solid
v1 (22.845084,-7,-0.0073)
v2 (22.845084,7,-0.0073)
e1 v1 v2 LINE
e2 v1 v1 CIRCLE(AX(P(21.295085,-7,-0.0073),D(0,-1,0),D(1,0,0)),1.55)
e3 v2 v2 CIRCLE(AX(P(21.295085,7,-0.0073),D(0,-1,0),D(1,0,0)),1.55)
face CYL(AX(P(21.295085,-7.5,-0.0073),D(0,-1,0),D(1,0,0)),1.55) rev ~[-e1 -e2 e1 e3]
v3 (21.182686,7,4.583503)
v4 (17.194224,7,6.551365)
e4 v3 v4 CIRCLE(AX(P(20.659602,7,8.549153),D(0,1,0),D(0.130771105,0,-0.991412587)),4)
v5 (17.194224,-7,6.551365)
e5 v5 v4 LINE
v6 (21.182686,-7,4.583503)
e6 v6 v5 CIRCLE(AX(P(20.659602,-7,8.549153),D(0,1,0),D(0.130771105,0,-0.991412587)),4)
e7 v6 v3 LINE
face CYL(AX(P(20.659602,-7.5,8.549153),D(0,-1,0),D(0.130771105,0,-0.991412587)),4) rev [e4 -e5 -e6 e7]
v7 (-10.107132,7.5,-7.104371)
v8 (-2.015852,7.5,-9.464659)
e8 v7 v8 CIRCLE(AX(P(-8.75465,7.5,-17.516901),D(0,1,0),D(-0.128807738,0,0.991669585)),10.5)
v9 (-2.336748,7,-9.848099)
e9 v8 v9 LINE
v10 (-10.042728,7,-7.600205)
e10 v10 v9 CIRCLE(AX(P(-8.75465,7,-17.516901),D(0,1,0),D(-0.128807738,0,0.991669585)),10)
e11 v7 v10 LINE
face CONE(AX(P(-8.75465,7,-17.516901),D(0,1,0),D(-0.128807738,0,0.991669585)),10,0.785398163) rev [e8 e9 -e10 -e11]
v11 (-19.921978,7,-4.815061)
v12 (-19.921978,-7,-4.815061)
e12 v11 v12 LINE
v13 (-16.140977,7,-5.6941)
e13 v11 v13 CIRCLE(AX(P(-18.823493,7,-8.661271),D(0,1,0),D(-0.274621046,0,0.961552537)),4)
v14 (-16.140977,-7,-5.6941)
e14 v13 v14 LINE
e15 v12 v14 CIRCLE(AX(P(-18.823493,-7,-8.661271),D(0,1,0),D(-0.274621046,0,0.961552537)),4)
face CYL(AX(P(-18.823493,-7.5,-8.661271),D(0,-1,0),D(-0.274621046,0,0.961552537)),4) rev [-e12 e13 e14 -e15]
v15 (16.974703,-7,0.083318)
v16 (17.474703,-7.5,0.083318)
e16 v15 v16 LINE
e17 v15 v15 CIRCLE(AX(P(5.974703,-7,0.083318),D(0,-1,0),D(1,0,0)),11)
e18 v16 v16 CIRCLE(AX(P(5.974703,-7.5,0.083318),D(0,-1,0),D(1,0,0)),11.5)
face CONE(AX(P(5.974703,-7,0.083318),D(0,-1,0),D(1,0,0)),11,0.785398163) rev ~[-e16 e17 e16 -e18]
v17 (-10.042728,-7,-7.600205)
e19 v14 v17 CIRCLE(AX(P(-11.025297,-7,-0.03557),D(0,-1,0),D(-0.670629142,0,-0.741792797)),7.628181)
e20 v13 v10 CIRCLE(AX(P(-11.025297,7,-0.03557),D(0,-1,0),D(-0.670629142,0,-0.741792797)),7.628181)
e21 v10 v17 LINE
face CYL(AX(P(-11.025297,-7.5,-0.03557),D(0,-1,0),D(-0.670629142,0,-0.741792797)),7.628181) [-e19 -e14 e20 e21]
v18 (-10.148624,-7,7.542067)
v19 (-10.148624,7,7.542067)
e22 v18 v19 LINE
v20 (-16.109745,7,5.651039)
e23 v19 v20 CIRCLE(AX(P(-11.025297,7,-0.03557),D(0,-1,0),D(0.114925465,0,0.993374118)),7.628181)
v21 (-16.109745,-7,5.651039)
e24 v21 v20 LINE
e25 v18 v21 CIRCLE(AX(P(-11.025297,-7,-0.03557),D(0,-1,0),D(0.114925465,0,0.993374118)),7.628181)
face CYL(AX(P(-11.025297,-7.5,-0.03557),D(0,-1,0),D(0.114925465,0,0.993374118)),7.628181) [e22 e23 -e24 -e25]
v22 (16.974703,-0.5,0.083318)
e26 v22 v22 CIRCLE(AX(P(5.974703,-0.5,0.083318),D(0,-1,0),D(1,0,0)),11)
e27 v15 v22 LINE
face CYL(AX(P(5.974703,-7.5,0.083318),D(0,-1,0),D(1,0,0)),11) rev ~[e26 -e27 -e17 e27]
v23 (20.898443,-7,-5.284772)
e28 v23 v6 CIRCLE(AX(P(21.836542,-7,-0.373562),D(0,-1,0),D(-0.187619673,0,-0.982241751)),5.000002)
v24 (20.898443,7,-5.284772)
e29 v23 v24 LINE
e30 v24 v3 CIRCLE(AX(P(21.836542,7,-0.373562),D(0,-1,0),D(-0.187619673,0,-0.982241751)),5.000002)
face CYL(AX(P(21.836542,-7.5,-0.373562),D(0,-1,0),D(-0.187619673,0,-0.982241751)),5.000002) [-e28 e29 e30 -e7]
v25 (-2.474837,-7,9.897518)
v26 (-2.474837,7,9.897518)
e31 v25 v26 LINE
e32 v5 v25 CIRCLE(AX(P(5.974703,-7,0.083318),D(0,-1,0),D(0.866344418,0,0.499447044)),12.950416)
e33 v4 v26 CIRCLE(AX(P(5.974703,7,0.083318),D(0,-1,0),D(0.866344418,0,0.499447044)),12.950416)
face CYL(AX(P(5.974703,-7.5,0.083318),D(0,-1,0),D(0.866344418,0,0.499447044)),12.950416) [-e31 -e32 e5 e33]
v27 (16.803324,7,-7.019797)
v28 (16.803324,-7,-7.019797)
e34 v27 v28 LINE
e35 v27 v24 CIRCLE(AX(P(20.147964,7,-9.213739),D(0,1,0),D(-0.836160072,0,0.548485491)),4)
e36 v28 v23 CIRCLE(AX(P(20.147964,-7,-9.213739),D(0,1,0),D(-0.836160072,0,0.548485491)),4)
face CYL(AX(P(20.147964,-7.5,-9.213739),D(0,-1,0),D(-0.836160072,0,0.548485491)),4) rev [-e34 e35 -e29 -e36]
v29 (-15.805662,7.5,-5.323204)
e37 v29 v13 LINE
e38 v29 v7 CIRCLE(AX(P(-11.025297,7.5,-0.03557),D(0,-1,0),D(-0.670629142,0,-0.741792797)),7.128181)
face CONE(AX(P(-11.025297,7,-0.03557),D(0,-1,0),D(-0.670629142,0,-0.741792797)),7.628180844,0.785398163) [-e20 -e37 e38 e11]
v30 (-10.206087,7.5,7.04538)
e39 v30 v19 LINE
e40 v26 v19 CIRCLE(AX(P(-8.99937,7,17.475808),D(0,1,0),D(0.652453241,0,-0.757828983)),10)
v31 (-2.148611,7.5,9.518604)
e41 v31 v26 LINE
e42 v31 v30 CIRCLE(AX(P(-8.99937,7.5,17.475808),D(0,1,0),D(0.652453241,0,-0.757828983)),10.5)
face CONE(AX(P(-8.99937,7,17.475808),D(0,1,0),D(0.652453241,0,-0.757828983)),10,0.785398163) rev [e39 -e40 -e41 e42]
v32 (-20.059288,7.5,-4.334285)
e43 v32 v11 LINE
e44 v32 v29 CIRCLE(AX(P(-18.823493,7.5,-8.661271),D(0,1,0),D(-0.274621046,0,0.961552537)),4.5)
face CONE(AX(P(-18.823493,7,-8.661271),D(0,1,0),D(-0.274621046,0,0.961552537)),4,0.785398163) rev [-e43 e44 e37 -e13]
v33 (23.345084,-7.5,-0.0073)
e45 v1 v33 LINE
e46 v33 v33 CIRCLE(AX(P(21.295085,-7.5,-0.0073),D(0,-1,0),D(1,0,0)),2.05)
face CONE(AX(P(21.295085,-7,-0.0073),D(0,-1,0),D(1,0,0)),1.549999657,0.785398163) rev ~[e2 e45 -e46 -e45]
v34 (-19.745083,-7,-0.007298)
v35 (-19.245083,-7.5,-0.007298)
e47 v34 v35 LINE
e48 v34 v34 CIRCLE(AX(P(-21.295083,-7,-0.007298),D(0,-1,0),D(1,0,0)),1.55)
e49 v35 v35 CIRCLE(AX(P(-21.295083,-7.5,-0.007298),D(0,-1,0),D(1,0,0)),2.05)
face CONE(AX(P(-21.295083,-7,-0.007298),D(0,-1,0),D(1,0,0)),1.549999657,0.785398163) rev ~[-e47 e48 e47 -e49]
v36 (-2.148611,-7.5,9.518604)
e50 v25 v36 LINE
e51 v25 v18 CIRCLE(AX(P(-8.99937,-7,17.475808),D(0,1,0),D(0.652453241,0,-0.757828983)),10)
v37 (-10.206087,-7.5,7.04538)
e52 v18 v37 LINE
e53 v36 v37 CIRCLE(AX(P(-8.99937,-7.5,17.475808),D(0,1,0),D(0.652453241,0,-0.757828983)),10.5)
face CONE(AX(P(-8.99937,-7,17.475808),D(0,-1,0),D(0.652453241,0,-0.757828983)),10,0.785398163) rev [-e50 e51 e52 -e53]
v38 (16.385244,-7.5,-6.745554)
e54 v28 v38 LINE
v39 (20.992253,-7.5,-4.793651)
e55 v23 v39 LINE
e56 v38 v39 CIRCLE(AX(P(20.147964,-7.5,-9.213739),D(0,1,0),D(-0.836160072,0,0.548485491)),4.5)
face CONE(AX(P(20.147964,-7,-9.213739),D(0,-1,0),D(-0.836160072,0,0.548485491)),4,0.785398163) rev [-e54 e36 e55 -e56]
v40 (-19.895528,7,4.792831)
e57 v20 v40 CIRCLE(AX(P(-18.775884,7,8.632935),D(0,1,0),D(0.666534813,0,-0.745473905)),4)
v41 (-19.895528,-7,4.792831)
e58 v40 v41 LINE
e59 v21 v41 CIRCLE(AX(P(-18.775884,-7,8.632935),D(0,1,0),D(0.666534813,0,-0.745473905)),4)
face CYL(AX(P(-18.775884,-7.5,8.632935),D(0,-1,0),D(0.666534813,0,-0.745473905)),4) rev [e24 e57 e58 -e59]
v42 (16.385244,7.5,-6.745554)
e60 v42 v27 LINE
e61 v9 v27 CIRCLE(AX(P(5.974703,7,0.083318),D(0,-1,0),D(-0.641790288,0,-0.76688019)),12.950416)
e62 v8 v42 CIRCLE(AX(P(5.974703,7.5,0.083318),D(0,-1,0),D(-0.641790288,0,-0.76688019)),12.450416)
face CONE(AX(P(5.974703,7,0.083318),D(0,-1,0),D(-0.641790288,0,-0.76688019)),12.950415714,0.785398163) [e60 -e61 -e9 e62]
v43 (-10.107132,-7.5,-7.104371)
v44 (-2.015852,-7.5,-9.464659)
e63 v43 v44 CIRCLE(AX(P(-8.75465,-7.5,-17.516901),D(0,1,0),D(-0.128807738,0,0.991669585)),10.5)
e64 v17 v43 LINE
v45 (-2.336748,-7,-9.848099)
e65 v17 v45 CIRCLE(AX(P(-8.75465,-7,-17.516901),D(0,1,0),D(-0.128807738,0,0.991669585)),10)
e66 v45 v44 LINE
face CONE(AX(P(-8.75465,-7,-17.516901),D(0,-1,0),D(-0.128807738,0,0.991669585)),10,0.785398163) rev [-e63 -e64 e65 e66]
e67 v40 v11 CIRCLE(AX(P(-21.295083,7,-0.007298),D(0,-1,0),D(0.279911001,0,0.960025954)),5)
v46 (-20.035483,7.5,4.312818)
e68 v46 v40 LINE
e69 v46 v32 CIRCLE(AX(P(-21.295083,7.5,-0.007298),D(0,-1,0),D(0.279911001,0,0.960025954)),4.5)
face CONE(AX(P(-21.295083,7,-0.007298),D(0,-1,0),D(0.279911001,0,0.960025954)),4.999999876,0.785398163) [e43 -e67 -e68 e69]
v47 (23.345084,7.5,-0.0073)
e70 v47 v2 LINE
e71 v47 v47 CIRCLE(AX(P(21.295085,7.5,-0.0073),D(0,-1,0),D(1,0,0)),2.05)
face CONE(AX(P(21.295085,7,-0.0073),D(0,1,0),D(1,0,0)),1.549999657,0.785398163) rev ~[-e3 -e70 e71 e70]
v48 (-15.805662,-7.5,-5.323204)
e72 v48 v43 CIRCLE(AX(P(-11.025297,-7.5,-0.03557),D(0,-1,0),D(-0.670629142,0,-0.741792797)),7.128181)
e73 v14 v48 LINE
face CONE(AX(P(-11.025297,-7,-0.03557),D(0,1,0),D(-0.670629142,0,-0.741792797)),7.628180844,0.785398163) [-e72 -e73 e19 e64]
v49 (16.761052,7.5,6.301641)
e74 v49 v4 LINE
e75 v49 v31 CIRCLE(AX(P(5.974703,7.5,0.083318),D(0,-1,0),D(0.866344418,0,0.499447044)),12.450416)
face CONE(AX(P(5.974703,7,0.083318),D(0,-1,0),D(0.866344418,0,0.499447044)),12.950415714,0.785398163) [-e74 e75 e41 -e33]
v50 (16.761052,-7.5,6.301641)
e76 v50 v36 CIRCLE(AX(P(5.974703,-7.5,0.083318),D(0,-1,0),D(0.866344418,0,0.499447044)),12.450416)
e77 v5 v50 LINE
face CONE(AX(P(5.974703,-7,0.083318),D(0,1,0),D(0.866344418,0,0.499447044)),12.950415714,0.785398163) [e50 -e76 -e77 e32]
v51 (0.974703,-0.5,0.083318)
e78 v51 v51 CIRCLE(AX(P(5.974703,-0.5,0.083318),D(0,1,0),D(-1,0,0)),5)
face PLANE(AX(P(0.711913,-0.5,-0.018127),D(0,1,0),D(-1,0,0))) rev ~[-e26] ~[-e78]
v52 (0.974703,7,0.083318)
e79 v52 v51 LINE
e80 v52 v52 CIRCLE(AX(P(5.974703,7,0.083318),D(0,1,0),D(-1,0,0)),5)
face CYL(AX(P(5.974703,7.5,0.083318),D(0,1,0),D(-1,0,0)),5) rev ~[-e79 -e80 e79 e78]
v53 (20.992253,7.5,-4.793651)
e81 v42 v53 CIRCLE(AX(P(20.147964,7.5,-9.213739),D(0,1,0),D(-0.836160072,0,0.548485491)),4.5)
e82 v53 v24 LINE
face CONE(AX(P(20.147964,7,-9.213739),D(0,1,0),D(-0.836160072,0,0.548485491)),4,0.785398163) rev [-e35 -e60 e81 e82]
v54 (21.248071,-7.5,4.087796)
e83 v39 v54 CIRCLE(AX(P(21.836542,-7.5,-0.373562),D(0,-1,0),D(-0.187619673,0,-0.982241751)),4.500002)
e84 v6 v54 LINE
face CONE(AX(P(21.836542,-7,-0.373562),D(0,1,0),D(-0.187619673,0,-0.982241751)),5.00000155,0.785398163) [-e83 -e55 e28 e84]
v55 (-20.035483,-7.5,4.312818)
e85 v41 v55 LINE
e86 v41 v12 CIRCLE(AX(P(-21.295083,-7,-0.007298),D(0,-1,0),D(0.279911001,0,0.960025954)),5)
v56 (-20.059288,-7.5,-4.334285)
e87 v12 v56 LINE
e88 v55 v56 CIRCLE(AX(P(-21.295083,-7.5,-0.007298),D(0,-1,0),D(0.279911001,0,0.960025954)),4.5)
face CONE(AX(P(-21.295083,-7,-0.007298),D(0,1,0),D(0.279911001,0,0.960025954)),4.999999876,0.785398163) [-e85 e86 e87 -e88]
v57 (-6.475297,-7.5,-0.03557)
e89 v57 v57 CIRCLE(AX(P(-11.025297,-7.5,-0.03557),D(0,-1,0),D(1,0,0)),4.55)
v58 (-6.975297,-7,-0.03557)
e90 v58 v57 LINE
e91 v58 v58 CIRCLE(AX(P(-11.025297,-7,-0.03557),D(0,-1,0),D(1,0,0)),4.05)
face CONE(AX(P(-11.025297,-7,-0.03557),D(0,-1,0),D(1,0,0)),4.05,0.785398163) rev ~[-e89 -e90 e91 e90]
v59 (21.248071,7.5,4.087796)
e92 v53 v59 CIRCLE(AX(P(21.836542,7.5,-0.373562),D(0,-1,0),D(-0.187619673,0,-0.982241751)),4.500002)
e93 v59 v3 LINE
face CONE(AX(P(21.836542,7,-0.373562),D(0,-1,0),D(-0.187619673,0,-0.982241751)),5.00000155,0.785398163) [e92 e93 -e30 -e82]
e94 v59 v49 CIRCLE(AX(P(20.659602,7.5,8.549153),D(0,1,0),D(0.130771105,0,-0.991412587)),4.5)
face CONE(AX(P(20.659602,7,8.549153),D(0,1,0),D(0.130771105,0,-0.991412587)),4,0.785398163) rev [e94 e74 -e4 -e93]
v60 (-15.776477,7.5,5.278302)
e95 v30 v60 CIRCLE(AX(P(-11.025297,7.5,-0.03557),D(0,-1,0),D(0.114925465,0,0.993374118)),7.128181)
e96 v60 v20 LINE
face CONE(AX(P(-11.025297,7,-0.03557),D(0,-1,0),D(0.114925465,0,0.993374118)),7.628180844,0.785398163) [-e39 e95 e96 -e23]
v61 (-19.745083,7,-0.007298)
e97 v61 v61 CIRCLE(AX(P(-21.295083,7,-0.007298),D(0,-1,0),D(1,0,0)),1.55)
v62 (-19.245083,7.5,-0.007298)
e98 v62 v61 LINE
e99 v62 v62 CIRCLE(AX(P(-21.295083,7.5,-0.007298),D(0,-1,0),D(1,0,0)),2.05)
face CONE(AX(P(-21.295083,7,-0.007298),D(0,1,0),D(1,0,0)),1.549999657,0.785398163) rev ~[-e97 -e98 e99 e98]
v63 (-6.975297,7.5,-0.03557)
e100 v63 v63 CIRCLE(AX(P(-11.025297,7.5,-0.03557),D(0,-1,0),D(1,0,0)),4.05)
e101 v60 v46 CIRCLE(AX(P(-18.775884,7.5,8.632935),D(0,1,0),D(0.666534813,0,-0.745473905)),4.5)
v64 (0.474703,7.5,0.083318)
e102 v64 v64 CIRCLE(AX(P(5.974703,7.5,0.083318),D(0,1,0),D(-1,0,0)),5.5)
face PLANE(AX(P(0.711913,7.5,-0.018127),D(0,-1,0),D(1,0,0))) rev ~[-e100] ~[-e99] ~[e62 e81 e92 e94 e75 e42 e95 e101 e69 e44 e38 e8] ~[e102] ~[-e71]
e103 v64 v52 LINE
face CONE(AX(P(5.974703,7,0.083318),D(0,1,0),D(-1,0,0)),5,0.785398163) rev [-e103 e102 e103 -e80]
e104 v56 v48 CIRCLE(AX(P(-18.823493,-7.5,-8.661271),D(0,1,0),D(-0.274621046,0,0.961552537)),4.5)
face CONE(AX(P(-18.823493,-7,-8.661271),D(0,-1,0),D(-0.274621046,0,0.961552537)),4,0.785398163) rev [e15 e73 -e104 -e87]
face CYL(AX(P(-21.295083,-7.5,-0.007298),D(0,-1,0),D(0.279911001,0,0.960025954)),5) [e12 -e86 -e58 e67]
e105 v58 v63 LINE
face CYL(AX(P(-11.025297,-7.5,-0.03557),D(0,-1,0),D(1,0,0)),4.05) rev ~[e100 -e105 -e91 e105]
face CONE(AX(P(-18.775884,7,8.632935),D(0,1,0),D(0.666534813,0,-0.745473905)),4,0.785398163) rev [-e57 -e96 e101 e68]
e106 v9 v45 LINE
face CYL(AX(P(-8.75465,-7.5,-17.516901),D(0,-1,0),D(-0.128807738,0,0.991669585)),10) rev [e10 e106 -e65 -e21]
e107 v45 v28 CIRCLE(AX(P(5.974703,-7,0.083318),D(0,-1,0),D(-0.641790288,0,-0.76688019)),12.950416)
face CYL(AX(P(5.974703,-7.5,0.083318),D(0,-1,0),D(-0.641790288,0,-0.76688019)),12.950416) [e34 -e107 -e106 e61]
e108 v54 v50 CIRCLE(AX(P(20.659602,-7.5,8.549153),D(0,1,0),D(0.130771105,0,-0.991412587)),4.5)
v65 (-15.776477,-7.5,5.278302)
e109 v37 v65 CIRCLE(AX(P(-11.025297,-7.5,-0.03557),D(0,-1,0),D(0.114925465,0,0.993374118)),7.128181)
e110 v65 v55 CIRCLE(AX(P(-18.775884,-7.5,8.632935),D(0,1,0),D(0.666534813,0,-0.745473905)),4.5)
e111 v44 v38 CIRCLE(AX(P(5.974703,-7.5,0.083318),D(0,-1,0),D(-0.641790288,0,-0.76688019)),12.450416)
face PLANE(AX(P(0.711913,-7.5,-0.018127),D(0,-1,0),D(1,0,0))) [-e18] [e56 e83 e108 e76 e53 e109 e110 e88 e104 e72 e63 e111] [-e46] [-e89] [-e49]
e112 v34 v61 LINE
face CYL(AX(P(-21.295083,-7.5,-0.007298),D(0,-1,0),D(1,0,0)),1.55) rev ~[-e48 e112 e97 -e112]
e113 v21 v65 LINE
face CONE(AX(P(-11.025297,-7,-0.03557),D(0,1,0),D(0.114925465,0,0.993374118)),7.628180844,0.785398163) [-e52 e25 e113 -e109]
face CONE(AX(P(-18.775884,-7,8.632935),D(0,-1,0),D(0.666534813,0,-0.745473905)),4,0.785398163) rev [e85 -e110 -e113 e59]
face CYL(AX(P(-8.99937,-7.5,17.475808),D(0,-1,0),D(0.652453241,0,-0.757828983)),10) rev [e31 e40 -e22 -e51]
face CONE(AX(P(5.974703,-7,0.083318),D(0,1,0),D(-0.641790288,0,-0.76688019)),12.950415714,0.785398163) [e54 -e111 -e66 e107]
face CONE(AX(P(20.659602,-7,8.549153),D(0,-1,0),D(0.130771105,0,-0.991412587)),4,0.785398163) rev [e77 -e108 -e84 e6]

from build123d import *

# Parameters (mm, degrees)
F1_R     = 1.5499996566
F1_R_2   = 4.05
F1_R_3   = 11
F2_DEPTH = 15
F3_R     = 1.5499996566
F3_R_2   = 11
F3_R_3   = 4.05
F3_R_4   = 5
F4_DEPTH = 8
F5_SIZE  = 0.5


# Not quite as in the source:
# - a feature names something its author has since deleted; it is built from what else it names


with BuildPart() as f2:
    # F1 (on offset) → F2 (new body)
    with BuildSketch(Plane.XZ.offset(7.5)):
        with BuildLine():
            ThreePointArc((-16.1097446178, 5.6510393794), (-17.8915523622, 4.7319149036), (-19.8955278727, 4.792831184))
            ThreePointArc((-19.8955278727, 4.792831184), (-26.2950637706, 0.0064660896), (-19.9219776461, -4.815061031))
            ThreePointArc((-19.9219776461, -4.815061031), (-17.917697117, -4.7651791649), (-16.1409768963, -5.694099989))
            ThreePointArc((-16.1409768963, -5.694099989), (-13.3010298936, -7.316379445), (-10.0427278071, -7.6002053168))
            ThreePointArc((-10.0427278071, -7.6002053168), (-5.9542872002, -7.917007121), (-2.3367475524, -9.848099267))
            ThreePointArc((-2.3367475524, -9.848099267), (7.8678117277, -12.7279820224), (16.8033240158, -7.0197971151))
            ThreePointArc((16.8033240158, -7.0197971151), (18.58751675, -5.5306692402), (20.898442998, -5.2847720721))
            ThreePointArc((20.898442998, -5.2847720721), (26.8344703592, -0.5175206843), (21.1826859269, 4.5835026796))
            ThreePointArc((21.1826859269, 4.5835026796), (18.8897447965, 4.9620083109), (17.1942238361, 6.5513648516))
            ThreePointArc((17.1942238361, 6.5513648516), (8.1466571288, 12.85030216), (-2.4748372324, 9.8975183761))
            ThreePointArc((-2.4748372324, 9.8975183761), (-6.0650144321, 7.9160195357), (-10.1486242942, 7.5420670334))
            ThreePointArc((-10.1486242942, 7.5420670334), (-13.3318829255, 7.2355232201), (-16.1097446178, 5.6510393794))
        make_face()
        with Locations((-21.2950828407, -0.0072984656)):
            Circle(F1_R, mode=Mode.SUBTRACT)
        with Locations((-11.0252965242, -0.0355703814)):
            Circle(F1_R_2, mode=Mode.SUBTRACT)
        with Locations((21.2950848365, -0.0073001884)):
            Circle(F1_R, mode=Mode.SUBTRACT)
        with Locations((5.9747034758, 0.0833180019)):
            Circle(F1_R_3, mode=Mode.SUBTRACT)
    extrude(amount=-F2_DEPTH)

    # F3 (on face) → F4 (join)
    with BuildSketch(Plane(origin=(0, 7.5, 0), x_dir=(-1, 0, 0), z_dir=(0, 1, 0))):
        with BuildLine():
            ThreePointArc((10.1486242942, 7.5420670334), (6.0650144321, 7.9160195357), (2.4748372324, 9.8975183761))
            ThreePointArc((2.4748372324, 9.8975183761), (-8.1466571288, 12.85030216), (-17.1942238361, 6.5513648516))
            ThreePointArc((-17.1942238361, 6.5513648516), (-18.8897447965, 4.9620083109), (-21.1826859269, 4.5835026796))
            ThreePointArc((-21.1826859269, 4.5835026796), (-26.8344703592, -0.5175206843), (-20.898442998, -5.2847720721))
            ThreePointArc((-20.898442998, -5.2847720721), (-18.58751675, -5.5306692402), (-16.8033240158, -7.0197971151))
            ThreePointArc((-16.8033240158, -7.0197971151), (-7.8678117277, -12.7279820224), (2.3367475524, -9.848099267))
            ThreePointArc((2.3367475524, -9.848099267), (5.9542872002, -7.917007121), (10.0427278071, -7.6002053168))
            ThreePointArc((10.0427278071, -7.6002053168), (13.3010298936, -7.316379445), (16.1409768963, -5.694099989))
            ThreePointArc((16.1409768963, -5.694099989), (17.917697117, -4.7651791649), (19.9219776461, -4.815061031))
            ThreePointArc((19.9219776461, -4.815061031), (26.2950637706, 0.0064660896), (19.8955278727, 4.792831184))
            ThreePointArc((19.8955278727, 4.792831184), (17.8915523622, 4.7319149036), (16.1097446178, 5.6510393794))
            ThreePointArc((16.1097446178, 5.6510393794), (13.3318829255, 7.2355232201), (10.1486242942, 7.5420670334))
        make_face()
        with Locations((-21.2950848365, -0.0073001884)):
            Circle(F3_R, mode=Mode.SUBTRACT)
        with Locations((-5.9747034758, 0.0833180019)):
            Circle(F3_R_2, mode=Mode.SUBTRACT)
        with Locations((11.0252965242, -0.0355703814)):
            Circle(F3_R_3, mode=Mode.SUBTRACT)
        with Locations((21.2950828407, -0.0072984656)):
            Circle(F3_R, mode=Mode.SUBTRACT)
        with Locations((-5.9747034758, 0.0833180019)):
            Circle(F3_R_2)
        with Locations((-5.9747034758, 0.0833180019)):
            Circle(F3_R_4, mode=Mode.SUBTRACT)
    extrude(amount=-F4_DEPTH)

    # F5
    f5_edges = [f2.edges().sort_by_distance(p)[0] for p in [
        (-6.065014, -7.5, 7.91602),
        (8.146657, -7.5, 12.850302),
        (18.889745, -7.5, 4.962008),
        (26.83447, -7.5, -0.517521),
        (18.587517, -7.5, -5.530669),
        (7.867812, -7.5, -12.727982),
        (-5.954287, -7.5, -7.917007),
        (-13.30103, -7.5, -7.316379),
        (-17.917697, -7.5, -4.765179),
        (-26.295064, -7.5, 0.006466),
        (-17.891552, -7.5, 4.731915),
        (-13.331883, -7.5, 7.235523),
        (-5.025297, -7.5, 0.083318),
        (-22.845082, -7.5, -0.007298),
        (19.745085, -7.5, -0.0073),
        (8.146657, 7.5, 12.850302),
        (-22.845082, 7.5, -0.007298),
        (10.974703, 7.5, 0.083318),
        (19.745085, 7.5, -0.0073),
        (-15.075297, -7.5, -0.03557),
        (-6.065014, 7.5, 7.91602),
        (-13.331883, 7.5, 7.235523),
        (-17.891552, 7.5, 4.731915),
        (-26.295064, 7.5, 0.006466),
        (-17.917697, 7.5, -4.765179),
        (-13.30103, 7.5, -7.316379),
        (-5.954287, 7.5, -7.917007),
        (7.867812, 7.5, -12.727982),
        (18.587517, 7.5, -5.530669),
        (26.83447, 7.5, -0.517521),
        (18.889745, 7.5, 4.962008),
    ]]
    chamfer(f5_edges, length=F5_SIZE)


solid = f2.part
